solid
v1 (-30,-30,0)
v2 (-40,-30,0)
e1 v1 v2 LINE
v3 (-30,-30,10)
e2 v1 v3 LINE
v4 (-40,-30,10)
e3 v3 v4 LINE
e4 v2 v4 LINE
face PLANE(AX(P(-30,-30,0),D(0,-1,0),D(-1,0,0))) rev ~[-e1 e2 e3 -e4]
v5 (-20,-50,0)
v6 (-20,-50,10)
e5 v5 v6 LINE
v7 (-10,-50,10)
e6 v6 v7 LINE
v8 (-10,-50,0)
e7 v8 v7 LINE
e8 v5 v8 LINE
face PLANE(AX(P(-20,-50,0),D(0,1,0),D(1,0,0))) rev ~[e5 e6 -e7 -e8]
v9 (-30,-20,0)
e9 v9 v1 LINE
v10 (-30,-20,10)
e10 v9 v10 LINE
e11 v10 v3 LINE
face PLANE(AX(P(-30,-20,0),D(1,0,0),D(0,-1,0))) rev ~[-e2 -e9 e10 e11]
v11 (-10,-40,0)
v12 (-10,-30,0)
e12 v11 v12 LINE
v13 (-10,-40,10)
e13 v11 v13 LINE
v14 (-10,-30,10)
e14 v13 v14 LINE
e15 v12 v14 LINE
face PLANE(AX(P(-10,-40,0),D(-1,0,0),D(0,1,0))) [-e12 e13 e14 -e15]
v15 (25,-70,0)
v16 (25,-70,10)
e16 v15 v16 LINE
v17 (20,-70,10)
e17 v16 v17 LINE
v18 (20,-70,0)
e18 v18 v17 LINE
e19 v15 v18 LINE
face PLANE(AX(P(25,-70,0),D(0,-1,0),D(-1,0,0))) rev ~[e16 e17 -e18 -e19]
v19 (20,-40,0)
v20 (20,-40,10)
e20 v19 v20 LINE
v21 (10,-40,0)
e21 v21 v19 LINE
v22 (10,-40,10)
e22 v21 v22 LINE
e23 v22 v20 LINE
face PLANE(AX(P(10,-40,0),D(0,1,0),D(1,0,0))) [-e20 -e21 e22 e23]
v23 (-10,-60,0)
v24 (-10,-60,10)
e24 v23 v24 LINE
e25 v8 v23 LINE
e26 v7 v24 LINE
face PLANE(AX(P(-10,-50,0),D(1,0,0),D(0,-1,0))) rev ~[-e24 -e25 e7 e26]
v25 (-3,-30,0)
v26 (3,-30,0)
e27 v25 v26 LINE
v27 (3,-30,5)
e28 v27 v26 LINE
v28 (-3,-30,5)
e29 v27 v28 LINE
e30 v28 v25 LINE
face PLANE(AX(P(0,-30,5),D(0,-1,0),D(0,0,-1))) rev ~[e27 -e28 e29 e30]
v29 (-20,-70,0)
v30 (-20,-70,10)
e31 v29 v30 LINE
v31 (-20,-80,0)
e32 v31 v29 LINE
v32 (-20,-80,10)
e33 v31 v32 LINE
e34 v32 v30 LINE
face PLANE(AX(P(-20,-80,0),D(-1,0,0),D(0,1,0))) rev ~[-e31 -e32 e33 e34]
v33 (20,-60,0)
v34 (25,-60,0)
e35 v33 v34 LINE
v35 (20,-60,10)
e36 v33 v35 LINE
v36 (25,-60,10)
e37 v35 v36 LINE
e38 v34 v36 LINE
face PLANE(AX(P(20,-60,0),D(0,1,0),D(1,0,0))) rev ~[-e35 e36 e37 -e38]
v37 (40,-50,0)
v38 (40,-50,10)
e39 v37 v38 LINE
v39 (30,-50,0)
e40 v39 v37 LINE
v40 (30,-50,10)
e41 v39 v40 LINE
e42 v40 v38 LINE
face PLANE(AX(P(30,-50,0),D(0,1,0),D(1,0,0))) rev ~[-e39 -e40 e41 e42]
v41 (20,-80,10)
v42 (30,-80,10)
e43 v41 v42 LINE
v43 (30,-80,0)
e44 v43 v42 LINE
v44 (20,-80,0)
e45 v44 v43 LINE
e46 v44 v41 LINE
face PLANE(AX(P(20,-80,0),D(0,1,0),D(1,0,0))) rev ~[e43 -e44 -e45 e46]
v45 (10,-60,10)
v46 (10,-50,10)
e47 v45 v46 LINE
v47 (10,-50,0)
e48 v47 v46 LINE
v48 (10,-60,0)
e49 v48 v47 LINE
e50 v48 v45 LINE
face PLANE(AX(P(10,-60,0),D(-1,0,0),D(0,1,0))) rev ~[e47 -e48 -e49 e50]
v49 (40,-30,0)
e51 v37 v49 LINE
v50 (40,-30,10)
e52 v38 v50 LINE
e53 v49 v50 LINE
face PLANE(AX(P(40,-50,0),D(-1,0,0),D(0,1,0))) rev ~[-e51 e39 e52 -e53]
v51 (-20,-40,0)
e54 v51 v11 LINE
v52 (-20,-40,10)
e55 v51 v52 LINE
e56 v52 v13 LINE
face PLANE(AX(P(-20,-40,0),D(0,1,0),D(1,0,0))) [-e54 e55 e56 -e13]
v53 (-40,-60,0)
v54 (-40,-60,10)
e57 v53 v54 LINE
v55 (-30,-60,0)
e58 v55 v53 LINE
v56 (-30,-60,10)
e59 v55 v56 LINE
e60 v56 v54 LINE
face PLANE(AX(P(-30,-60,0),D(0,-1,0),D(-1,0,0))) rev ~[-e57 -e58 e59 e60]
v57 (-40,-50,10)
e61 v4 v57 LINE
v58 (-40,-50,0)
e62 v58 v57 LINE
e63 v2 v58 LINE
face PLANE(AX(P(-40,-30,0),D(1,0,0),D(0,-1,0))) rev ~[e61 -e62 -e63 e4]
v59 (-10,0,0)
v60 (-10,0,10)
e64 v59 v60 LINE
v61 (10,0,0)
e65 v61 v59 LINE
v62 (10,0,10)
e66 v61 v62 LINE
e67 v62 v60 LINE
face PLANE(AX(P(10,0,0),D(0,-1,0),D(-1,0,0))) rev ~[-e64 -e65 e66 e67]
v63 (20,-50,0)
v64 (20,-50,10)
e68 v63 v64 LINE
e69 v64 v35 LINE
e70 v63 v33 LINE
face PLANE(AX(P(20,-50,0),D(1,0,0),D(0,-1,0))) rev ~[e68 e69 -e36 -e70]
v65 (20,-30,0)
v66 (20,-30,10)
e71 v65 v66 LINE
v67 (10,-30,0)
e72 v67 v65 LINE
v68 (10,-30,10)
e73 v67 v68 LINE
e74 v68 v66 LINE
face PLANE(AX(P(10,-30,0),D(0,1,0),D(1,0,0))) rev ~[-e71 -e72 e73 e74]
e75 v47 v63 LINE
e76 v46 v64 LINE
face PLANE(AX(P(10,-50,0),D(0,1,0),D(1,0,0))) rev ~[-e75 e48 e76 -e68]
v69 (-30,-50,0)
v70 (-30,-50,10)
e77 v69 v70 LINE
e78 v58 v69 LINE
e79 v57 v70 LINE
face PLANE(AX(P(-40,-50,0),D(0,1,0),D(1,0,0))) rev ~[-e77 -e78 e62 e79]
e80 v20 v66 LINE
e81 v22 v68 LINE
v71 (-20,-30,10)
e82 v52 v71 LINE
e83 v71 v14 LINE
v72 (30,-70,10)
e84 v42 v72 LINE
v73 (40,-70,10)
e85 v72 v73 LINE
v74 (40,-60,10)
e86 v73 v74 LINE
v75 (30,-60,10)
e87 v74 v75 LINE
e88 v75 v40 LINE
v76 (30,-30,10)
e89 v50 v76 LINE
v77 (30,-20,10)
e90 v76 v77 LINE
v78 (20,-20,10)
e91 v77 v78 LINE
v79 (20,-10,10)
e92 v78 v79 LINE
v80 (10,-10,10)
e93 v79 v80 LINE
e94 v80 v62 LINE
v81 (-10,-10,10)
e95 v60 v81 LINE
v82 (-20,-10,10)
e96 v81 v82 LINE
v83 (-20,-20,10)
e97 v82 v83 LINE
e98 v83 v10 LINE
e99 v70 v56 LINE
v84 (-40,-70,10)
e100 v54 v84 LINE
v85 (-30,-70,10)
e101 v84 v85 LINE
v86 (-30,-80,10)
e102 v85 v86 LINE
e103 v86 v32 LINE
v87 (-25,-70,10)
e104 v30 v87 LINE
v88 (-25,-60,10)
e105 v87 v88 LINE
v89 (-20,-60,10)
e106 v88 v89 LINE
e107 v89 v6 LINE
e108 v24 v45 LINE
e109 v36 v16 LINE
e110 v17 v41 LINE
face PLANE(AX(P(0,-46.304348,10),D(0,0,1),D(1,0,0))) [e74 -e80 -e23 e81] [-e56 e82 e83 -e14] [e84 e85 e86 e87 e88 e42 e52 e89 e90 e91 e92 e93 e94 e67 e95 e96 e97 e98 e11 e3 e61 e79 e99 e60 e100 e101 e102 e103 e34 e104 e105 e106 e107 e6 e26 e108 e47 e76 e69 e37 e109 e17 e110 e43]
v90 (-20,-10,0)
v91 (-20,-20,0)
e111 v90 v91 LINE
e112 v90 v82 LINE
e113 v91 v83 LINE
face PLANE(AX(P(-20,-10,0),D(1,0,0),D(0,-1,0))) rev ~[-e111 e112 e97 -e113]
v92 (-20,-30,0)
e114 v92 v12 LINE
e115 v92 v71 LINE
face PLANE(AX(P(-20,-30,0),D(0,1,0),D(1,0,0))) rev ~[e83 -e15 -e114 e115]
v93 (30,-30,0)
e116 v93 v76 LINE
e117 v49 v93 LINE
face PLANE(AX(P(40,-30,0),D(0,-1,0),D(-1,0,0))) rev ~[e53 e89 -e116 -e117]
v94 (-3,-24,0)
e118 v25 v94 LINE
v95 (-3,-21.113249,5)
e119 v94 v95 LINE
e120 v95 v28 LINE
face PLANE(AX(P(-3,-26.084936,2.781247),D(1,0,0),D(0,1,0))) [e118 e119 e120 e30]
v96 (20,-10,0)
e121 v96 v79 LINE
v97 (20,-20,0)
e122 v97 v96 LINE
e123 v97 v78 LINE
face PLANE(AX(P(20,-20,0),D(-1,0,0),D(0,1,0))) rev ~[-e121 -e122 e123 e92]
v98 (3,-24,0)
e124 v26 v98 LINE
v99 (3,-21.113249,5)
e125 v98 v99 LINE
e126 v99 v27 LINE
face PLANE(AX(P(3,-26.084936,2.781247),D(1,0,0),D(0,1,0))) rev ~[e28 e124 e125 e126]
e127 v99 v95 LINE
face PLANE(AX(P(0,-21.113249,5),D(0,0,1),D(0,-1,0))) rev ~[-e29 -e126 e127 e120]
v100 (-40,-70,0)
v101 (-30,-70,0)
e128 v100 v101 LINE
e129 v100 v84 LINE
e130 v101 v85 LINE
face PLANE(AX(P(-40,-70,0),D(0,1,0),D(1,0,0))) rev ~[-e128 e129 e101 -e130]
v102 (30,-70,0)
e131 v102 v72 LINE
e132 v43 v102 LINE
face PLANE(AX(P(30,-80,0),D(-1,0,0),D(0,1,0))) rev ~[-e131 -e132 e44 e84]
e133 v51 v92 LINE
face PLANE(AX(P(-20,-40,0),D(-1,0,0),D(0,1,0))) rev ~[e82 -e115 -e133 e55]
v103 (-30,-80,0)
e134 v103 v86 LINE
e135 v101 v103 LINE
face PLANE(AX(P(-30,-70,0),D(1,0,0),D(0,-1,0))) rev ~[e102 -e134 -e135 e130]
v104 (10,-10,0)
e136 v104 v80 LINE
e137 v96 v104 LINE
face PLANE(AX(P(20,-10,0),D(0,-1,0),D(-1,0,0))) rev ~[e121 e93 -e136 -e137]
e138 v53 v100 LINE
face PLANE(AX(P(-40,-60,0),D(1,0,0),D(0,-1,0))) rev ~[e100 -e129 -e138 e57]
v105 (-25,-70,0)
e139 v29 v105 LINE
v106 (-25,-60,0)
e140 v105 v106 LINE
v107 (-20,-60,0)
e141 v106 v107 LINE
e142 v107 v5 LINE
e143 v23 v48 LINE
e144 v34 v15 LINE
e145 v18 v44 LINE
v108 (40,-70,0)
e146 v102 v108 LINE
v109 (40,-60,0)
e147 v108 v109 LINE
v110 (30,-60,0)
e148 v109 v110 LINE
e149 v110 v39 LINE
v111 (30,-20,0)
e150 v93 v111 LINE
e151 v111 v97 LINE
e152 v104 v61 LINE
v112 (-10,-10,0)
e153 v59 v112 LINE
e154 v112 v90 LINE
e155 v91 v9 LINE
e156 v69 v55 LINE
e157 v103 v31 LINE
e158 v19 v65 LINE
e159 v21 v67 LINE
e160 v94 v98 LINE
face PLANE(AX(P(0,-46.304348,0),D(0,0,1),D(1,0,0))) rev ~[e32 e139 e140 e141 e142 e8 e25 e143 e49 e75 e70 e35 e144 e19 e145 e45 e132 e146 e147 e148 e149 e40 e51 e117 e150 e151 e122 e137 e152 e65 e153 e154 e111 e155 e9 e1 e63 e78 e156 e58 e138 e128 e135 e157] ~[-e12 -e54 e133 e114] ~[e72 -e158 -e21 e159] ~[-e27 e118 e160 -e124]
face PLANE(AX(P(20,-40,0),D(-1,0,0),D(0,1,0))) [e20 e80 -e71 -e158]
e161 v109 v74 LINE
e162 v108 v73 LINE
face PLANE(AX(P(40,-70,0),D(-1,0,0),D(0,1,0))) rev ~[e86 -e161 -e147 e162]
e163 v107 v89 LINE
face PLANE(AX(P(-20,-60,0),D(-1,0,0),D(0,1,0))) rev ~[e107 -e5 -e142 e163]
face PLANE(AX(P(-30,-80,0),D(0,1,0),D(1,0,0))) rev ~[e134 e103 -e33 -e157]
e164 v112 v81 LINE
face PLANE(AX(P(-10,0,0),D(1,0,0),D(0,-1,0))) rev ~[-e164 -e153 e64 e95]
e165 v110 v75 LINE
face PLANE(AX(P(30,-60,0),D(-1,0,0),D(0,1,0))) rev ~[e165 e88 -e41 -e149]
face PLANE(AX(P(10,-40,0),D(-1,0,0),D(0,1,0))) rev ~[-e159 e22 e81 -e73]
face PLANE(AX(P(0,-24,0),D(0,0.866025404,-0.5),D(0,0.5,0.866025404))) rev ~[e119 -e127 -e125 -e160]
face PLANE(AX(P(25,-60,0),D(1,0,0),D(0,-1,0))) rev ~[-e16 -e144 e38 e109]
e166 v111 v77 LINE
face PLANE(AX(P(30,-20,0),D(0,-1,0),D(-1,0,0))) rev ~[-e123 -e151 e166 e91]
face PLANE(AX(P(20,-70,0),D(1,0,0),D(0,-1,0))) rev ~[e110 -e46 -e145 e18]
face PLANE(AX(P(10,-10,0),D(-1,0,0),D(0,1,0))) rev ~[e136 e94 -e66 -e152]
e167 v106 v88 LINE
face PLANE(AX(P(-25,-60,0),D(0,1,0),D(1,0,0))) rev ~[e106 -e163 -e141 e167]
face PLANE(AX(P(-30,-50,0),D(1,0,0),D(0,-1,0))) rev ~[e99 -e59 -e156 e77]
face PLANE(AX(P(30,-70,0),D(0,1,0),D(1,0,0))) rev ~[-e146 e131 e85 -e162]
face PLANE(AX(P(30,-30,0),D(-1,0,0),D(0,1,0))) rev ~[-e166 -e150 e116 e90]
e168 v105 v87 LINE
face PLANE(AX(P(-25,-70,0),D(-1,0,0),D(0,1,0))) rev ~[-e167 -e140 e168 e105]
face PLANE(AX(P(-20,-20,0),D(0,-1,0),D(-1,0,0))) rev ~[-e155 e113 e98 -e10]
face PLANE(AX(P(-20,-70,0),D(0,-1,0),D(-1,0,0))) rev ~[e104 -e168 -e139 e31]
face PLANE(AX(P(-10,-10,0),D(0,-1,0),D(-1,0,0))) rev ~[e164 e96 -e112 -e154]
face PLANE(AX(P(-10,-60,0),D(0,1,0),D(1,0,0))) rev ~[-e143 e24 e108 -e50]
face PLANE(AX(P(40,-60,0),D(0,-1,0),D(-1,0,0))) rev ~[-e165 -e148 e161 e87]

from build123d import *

# Parameters (mm, degrees)
F0_W     = 10
F0_H     = 10
F0_R     = 6
F1_DEPTH = 10
F3_DEPTH = 3


with BuildPart() as f1:
    # F0 (on Top) → F1 (new body)
    with BuildSketch(Plane.XY):
        Polygon((10, 0), (0, 0), (-10, 0), (-10, -10), (-20, -10), (-20, -20), (-30, -20), (-30, -30), (-40, -30), (-40, -40), (-40, -50), (-30, -50), (-30, -60), (-40, -60), (-40, -70), (-30, -70), (-30, -80), (-20, -80), (-20, -70), (-25, -70), (-25, -60), (-20, -60), (-20, -50), (-10, -50), (-10, -60), (0, -60), (10, -60), (10, -50), (20, -50), (20, -60), (25, -60), (25, -70), (20, -70), (20, -80), (30, -80), (30, -70), (40, -70), (40, -60), (30, -60), (30, -50), (40, -50), (40, -40), (40, -30), (30, -30), (30, -20), (20, -20), (20, -10), (10, -10), align=None)
        with Locations((-15, -35)):
            Rectangle(F0_W, F0_H, mode=Mode.SUBTRACT)
        with Locations((15, -35)):
            Rectangle(F0_W, F0_H, mode=Mode.SUBTRACT)
        with Locations((0, -15)):
            Circle(F0_R, mode=Mode.SUBTRACT)
        with Locations((0, -15)):
            Circle(F0_R)
    extrude(amount=F1_DEPTH)

    # F2 (on Right) → F3 (cut, symmetric)
    with BuildSketch(Plane.YZ):
        Polygon((-30, 5), (-30, 0), (-24, 0), (-21.1132486541, 5), align=None)
    extrude(amount=F3_DEPTH, both=True, mode=Mode.SUBTRACT)


solid = f1.part
